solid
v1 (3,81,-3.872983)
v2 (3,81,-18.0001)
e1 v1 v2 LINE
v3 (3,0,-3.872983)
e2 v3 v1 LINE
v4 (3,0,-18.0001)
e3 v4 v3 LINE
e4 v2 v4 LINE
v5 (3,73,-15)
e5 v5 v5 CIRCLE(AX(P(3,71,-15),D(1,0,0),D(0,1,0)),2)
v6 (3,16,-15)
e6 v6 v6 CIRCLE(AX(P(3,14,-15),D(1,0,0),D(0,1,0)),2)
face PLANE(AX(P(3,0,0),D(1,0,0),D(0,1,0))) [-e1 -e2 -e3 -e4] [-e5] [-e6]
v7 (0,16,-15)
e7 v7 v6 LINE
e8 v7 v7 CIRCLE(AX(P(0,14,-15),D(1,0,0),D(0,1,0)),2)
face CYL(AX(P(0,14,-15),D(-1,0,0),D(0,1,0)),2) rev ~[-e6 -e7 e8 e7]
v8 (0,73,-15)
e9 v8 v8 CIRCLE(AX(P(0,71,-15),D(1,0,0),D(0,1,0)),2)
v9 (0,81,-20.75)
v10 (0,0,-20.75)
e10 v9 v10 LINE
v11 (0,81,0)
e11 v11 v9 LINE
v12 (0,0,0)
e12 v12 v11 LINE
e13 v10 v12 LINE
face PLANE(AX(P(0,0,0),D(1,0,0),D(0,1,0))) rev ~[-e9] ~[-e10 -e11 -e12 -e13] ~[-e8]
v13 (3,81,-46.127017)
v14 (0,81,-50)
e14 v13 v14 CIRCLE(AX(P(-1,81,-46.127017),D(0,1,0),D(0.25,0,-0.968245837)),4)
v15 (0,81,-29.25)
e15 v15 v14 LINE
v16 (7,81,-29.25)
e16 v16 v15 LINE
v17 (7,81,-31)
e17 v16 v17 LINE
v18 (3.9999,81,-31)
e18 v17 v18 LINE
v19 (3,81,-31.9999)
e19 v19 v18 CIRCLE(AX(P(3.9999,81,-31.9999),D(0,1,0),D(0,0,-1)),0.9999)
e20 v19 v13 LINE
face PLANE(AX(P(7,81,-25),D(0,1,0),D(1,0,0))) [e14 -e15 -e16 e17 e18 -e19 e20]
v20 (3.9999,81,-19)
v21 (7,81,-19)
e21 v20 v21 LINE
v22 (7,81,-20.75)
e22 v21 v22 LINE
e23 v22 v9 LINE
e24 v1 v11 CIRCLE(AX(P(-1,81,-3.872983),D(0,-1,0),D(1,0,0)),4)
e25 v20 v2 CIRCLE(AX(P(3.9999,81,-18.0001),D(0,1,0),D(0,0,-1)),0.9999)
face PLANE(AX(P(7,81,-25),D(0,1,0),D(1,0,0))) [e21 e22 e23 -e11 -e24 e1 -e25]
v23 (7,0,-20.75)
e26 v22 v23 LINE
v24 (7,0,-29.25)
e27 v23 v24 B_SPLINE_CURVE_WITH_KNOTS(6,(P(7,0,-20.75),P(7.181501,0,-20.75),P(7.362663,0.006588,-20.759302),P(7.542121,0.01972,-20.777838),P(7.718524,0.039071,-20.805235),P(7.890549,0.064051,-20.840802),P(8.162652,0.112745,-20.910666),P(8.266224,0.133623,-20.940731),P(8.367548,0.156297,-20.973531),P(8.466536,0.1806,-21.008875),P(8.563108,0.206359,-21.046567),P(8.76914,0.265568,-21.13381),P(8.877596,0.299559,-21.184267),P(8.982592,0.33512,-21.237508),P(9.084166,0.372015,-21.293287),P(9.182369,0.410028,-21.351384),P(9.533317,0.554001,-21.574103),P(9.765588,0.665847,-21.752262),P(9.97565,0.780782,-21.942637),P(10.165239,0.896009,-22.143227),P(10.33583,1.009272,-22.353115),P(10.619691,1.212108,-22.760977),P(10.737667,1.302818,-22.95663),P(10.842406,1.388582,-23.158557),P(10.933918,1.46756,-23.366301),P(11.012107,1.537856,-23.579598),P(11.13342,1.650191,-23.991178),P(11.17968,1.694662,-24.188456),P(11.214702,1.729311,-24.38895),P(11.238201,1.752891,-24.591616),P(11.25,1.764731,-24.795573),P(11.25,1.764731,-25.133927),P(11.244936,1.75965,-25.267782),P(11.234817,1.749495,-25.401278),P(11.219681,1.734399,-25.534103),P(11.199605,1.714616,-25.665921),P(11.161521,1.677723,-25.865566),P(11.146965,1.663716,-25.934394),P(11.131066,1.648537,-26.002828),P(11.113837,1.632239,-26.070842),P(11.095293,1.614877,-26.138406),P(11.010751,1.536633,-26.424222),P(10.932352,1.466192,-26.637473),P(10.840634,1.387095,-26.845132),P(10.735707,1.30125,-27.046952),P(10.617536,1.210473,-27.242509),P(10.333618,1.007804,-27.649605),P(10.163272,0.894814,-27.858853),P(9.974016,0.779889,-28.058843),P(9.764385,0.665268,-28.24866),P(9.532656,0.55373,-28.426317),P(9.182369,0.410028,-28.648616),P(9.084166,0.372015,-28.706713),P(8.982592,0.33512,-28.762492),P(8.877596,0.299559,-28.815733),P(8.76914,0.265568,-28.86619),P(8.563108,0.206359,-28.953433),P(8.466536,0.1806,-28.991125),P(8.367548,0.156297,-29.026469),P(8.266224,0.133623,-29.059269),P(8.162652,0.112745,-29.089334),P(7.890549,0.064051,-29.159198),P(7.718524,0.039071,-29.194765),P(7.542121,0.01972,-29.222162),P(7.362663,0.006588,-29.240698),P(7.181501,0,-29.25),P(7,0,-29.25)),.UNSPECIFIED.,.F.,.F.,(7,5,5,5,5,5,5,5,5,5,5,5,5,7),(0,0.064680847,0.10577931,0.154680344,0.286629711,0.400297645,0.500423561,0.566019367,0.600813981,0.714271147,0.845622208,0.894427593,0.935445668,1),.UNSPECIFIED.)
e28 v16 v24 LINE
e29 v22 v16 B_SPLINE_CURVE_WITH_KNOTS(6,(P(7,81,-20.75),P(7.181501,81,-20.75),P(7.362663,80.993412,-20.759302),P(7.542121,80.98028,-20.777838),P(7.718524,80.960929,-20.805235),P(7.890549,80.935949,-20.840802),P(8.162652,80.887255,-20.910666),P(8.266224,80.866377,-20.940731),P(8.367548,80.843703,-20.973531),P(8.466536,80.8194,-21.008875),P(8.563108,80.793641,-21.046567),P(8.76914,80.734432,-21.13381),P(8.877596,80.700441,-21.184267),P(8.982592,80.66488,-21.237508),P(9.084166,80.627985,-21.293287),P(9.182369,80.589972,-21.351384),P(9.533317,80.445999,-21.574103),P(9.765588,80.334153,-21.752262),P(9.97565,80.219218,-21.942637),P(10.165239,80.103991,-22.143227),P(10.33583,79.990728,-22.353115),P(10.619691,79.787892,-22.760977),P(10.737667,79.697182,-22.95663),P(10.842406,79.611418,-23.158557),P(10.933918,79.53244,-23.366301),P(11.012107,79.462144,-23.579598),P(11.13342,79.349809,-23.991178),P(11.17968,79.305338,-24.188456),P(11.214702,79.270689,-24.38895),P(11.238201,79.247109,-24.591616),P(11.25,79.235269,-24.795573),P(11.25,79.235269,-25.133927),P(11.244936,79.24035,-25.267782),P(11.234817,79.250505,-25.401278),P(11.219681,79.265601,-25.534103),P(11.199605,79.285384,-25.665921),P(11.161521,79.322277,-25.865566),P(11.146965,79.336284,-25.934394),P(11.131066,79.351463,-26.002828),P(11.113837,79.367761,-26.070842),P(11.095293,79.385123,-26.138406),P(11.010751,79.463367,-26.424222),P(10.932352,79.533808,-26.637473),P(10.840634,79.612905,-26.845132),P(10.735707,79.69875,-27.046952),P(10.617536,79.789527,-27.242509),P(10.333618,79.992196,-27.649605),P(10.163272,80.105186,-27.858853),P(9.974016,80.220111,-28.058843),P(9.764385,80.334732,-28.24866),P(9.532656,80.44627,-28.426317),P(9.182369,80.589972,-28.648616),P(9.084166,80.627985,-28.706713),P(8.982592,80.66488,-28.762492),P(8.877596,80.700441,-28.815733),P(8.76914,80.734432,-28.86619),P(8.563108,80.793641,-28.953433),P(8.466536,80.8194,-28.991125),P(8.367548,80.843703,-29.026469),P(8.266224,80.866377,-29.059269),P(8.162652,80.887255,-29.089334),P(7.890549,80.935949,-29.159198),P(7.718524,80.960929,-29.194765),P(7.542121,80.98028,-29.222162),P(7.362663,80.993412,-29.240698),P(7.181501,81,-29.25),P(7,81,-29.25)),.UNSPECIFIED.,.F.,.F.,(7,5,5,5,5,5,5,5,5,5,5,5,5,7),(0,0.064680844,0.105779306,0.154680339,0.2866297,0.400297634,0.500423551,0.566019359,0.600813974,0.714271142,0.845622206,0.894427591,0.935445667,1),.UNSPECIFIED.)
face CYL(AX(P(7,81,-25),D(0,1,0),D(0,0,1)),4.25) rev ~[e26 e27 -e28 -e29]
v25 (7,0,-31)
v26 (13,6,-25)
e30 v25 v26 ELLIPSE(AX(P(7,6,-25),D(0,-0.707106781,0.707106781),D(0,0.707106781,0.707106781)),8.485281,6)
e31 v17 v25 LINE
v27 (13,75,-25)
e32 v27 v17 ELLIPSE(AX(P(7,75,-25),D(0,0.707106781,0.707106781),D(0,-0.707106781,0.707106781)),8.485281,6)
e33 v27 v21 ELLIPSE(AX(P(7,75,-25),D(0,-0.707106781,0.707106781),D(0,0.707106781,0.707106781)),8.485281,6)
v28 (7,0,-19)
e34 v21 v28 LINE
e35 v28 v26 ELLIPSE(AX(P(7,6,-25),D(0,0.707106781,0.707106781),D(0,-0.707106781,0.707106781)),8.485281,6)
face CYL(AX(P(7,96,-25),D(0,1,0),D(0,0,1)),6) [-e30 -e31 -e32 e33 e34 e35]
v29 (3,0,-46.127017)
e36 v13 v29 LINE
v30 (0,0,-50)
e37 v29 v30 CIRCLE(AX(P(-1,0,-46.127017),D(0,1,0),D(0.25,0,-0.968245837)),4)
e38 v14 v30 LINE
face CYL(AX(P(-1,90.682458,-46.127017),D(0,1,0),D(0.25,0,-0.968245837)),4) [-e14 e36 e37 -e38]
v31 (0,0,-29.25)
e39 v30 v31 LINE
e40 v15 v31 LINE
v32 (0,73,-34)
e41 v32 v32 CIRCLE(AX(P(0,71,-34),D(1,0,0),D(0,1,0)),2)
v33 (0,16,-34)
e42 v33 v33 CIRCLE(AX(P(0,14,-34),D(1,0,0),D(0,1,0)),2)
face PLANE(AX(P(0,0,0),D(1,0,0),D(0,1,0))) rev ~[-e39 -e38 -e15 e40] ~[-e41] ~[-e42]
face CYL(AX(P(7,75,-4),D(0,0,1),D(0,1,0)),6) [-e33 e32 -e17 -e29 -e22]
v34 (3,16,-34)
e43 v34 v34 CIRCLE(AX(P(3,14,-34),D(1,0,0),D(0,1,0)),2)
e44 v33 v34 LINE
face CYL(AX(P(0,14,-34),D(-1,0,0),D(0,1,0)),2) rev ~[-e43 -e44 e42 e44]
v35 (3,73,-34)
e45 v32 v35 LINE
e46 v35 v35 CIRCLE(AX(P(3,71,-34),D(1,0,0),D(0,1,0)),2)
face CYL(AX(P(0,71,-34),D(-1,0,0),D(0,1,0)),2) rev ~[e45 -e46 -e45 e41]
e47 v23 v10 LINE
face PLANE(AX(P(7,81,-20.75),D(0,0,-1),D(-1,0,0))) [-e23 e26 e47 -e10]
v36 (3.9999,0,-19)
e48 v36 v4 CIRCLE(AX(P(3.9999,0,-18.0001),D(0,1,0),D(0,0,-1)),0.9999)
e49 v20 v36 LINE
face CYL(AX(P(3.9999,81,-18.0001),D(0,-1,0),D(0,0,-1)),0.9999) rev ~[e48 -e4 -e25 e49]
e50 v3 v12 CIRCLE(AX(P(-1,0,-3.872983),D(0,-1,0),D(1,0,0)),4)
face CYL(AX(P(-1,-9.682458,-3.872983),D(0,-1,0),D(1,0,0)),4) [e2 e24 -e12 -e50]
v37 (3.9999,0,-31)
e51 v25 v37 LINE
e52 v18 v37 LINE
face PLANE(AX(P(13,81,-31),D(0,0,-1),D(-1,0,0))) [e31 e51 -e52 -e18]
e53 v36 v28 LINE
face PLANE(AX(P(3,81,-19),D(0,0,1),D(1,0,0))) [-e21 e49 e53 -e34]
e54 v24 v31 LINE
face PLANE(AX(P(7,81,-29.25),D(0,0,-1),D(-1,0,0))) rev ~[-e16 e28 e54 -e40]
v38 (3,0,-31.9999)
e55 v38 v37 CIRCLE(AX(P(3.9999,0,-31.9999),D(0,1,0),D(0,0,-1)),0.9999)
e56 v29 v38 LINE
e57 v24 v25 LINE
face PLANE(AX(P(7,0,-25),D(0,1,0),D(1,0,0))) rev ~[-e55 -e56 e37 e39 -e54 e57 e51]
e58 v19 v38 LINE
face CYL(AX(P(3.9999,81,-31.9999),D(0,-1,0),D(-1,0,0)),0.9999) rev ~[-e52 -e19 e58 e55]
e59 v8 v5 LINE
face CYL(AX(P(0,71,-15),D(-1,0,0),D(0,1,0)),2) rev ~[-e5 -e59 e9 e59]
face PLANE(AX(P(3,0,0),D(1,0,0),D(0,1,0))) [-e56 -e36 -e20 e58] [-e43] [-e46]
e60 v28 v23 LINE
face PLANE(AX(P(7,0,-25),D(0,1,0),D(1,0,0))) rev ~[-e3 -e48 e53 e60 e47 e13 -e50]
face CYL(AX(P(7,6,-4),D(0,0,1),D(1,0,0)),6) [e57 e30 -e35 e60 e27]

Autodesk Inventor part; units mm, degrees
ref_plane "YZ Plane" through (0, 0, 0) normal (1, 0, 0) x (0, 1, 0)
ref_plane "XZ Plane" through (0, 0, 0) normal (0, 1, 0) x (-1, 0, 0)
ref_plane "XY Plane" through (0, 0, 0) normal (0, 0, 1) x (1, 0, 0)
sketch "Sketch1" plane through (0, 0, 0) normal (1, 0, 0) x (0, 1, 0)
  line L0 (0, 0) -> (81, 0)
  line L1 (81, 0) -> (81, -50)
  line L2 (81, -50) -> (0, -50)
  line L3 (0, -50) -> (0, 0)
  circle A0 centre (71, -15) radius 2
  circle A1 centre (71, -34) radius 2
  circle A2 centre (14, -15) radius 2
  circle A3 centre (14, -34) radius 2
  dimension "d0" = 81
  dimension "d1" = 50
  dimension "d2" = 4
  dimension "d3" = 15
  dimension "d4" = 4
  dimension "d5" = 16
  dimension "d6" = 4
  dimension "d7" = 15
  dimension "d8" = 4
  dimension "d9" = 57
  dimension "d11" = 10
  dimension "d12" = 57
  dimension "d13" = 10
extrude "Extrusion1" add sketch "Sketch1" along normal blind 3
sketch "Sketch5" plane through (0, 81, 0) normal (0, 1, 0) x (1, 0, 0)
  circle A0 centre (7, 25) radius 4
  line L0 (0, 0) -> (3, 0) projected
  line L1 (3, 50) -> (3, 0) projected
  dimension "d26" = 8
  dimension "d27" = 25
  dimension "d28" = 4
extrude "Extrusion3" add sketch "Sketch5" against normal blind 81
sketch "Sketch9" plane through (7, 81, -25) normal (0, 1, 0) x (1, 0, 0)
  line L0 (-4, 0) -> (-4, -25) projected
  line L1 (-4, -6) -> (6, -6)
  line L2 (6, -6) -> (6, 6)
  line L3 (6, 6) -> (-4, 6)
  line L4 (-4, 6) -> (-4, -6)
  line L5 (-7, -25) -> (-4, -25) projected
  dimension "d42" = 10
  dimension "d43" = 12
  dimension "d44" = 19
extrude "Extrusion6" add sketch "Sketch9" against normal blind 81
sketch "Sketch10" plane through (0, 81, 0) normal (0, 1, 0) x (1, 0, 0)
  line L0 (3, 19) -> (13, 19) projected
  line L1 (13, 19) -> (13, 31) projected
  line L2 (7, 29.25) -> (0, 29.25)
  line L3 (0, 50) -> (0, 0) projected
  line L4 (7, 20.75) -> (0, 20.75)
  arc A0 (7, 20.75) -> (7, 29.25) centre (7, 25) ccw
  arc A1 (7, 20.75) -> (7, 29.25) centre (7, 25) ccw
  arc A2 (7, 20.75) -> (7, 29.25) centre (7, 25) ccw
  dimension "d55" = 4.25
  dimension "d56" = 4.25
  dimension "d57" = 4.25
extrude "Extrusion8" cut sketch "Sketch10" against normal blind 81
fillet "Fillet4" radius 4 2 edges at (3, 40.5, 0) (3, 40.5, -50)
fillet "Fillet5" radius 1 2 edges at (3, 40.5, -19) (3, 40.5, -31)
fillet "Fillet6" radius 6 4 edges at (13, 81, -25) (13, 0, -25) (13, 40.5, -19) (13, 40.5, -31)
